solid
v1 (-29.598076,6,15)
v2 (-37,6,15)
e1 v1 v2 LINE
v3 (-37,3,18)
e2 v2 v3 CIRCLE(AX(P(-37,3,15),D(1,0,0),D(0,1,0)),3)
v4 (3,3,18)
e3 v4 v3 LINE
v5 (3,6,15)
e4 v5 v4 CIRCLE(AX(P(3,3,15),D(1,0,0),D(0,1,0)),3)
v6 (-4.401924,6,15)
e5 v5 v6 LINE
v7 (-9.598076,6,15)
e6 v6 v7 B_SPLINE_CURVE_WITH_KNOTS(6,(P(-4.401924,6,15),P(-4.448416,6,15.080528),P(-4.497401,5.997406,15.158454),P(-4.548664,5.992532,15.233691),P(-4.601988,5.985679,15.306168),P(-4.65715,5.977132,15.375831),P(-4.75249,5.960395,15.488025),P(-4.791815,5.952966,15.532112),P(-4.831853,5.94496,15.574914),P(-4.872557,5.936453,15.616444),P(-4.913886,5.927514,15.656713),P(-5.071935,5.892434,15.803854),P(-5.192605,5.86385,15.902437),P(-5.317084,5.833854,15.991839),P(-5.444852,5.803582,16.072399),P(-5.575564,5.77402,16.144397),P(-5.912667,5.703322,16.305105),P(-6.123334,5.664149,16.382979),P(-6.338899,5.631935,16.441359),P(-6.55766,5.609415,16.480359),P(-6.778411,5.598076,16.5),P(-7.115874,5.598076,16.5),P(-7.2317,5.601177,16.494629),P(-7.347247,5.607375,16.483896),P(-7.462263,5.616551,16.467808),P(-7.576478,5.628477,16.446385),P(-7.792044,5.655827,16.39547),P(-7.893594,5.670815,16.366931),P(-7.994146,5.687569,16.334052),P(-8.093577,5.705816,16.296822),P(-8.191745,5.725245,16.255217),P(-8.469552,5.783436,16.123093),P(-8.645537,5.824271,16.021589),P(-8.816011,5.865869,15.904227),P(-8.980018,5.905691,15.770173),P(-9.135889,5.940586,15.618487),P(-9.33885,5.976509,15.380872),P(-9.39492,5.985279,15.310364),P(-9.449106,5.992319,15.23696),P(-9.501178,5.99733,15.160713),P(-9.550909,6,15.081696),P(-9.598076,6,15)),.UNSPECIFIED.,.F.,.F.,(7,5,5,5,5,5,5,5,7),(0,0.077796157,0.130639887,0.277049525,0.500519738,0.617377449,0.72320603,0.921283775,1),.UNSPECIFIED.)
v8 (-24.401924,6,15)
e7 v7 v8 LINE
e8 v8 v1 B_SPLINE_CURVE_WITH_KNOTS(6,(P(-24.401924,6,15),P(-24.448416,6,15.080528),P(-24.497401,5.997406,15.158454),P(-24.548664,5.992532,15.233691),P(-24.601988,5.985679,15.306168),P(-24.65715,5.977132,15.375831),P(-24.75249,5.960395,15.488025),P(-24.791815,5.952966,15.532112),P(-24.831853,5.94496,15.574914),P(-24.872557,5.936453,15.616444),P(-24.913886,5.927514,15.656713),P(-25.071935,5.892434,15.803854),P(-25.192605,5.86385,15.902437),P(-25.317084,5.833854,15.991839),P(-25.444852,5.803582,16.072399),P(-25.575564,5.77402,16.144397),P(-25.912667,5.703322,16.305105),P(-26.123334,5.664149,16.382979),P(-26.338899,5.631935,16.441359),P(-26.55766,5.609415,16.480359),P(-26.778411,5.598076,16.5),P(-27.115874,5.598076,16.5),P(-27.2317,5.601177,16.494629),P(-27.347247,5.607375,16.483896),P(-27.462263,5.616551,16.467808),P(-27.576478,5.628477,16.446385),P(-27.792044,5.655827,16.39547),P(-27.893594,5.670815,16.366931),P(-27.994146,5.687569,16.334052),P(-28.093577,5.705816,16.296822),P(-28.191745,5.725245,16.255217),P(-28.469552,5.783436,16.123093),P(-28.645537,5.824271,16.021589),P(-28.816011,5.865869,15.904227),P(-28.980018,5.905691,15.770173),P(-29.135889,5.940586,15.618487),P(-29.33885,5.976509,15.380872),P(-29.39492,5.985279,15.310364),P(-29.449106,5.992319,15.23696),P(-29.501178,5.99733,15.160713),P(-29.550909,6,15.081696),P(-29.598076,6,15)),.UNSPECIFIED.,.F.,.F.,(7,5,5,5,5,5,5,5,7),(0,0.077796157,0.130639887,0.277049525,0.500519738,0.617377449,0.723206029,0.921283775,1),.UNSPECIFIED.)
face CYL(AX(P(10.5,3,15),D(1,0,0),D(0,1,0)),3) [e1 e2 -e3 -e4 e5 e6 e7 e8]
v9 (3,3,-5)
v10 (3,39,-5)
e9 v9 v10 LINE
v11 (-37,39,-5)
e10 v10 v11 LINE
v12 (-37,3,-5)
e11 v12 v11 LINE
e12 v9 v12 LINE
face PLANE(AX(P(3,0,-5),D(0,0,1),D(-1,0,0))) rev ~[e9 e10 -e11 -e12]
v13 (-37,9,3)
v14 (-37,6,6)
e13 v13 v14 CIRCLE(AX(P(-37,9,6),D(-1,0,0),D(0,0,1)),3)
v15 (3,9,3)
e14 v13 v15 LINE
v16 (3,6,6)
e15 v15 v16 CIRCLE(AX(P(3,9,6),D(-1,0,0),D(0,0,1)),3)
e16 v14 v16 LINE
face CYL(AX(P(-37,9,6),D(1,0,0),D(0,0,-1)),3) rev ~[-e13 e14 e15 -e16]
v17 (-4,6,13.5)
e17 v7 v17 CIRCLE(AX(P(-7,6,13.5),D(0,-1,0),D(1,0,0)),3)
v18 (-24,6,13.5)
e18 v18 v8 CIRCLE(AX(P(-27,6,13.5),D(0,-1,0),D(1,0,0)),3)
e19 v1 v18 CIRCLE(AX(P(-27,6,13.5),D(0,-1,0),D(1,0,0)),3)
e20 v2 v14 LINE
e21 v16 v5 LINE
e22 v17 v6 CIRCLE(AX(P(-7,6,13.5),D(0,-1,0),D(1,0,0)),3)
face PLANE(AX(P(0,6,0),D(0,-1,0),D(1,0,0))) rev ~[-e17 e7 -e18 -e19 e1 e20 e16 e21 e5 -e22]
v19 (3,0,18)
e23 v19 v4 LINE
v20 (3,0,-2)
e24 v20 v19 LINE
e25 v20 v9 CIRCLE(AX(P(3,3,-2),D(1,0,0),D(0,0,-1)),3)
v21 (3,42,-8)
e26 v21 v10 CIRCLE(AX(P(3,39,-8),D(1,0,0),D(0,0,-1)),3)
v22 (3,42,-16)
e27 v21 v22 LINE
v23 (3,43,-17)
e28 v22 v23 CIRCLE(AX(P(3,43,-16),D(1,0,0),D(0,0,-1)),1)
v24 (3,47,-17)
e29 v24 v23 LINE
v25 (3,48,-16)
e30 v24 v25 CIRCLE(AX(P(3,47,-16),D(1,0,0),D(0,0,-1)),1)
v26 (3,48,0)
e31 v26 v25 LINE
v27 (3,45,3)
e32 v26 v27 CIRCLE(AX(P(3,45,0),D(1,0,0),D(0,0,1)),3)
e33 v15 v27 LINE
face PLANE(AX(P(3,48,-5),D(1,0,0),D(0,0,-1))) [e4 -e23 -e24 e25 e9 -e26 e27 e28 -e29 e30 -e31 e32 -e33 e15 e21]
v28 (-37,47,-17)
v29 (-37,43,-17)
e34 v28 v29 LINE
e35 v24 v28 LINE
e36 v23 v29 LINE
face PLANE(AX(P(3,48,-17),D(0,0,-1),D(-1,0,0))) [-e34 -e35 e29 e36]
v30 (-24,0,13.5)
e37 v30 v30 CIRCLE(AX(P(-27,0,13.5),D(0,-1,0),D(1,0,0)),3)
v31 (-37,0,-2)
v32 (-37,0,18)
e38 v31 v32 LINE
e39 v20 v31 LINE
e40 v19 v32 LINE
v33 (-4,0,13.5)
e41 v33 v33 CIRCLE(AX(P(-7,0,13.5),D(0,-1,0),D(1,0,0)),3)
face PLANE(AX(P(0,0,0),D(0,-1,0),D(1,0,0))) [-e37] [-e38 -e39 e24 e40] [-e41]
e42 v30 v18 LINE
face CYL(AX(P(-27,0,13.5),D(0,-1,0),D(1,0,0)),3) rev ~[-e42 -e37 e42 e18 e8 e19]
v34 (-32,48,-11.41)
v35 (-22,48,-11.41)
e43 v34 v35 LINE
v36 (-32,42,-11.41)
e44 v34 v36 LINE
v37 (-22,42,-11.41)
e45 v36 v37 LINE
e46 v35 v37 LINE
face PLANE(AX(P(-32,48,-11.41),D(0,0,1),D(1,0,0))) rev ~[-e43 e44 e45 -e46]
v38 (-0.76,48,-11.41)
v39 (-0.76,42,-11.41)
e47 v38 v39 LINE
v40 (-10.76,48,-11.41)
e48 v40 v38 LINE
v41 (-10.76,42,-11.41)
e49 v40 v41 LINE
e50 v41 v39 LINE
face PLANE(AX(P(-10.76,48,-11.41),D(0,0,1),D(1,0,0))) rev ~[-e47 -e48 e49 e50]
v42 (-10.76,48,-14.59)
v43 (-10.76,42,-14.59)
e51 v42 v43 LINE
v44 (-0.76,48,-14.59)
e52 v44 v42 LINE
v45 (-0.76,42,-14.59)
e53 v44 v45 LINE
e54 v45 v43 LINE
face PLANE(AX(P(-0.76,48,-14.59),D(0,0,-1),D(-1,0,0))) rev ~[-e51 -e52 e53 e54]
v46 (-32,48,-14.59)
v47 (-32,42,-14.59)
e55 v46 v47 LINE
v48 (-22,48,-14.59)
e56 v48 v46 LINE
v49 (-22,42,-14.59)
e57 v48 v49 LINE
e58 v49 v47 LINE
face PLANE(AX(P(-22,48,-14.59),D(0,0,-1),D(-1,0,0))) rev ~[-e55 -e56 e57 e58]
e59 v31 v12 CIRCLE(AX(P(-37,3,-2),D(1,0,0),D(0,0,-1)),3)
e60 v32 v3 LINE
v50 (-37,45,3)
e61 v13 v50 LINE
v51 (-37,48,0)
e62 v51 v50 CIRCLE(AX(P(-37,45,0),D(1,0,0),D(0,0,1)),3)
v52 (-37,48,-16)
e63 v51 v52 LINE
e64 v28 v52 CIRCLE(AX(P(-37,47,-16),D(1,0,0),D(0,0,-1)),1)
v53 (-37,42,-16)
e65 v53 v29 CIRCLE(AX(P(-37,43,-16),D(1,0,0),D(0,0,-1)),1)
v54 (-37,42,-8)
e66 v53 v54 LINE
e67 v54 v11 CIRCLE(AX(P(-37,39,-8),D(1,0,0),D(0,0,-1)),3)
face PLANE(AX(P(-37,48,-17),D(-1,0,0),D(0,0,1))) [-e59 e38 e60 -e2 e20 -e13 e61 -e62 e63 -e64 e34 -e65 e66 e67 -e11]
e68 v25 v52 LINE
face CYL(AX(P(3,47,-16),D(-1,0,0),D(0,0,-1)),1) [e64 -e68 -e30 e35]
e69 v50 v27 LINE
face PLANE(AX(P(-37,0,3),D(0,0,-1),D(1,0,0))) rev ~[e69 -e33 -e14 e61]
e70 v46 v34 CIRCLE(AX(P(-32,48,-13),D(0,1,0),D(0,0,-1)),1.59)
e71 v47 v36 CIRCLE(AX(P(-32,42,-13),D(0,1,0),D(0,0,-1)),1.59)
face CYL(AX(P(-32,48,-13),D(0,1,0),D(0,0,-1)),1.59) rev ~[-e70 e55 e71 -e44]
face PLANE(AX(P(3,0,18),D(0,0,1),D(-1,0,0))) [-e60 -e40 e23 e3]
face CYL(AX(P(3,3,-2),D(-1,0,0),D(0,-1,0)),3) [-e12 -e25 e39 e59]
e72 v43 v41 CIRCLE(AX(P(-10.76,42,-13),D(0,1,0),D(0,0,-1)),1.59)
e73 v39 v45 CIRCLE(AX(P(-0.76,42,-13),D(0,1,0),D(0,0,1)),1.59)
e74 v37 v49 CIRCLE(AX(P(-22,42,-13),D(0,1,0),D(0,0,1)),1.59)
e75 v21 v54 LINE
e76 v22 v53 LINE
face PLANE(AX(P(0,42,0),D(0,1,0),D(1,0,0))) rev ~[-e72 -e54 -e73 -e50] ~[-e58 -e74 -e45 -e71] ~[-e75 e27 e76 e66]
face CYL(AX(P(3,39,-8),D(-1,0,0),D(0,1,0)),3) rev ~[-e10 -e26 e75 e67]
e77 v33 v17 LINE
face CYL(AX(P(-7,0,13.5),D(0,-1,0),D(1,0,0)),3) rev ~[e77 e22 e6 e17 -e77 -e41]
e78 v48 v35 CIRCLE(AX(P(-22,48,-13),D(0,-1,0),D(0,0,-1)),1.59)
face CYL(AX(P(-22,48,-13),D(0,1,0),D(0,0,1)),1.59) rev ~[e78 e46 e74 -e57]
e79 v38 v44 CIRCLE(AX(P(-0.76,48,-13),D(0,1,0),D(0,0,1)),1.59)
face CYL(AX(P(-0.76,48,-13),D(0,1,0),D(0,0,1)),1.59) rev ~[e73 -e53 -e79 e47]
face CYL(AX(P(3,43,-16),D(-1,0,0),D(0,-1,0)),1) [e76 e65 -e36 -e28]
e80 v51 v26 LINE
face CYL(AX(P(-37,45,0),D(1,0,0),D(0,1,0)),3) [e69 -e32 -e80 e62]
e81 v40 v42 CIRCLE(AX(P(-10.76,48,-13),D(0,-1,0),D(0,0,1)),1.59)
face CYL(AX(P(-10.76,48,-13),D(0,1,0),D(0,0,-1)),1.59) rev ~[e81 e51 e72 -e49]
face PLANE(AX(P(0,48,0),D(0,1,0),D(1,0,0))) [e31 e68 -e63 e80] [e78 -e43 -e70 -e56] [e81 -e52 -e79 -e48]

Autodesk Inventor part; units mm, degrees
ref_plane "YZ Plane" through (0, 0, 0) normal (1, 0, 0) x (0, 1, 0)
ref_plane "XZ Plane" through (0, 0, 0) normal (0, 1, 0) x (-1, 0, 0)
ref_plane "XY Plane" through (0, 0, 0) normal (0, 0, 1) x (1, 0, 0)
sketch "Sketch1" plane through (0, 0, 0) normal (0, 1, 0) x (-1, 0, 0)
  line L0 (0, 0) -> (34, 0)
  line L1 (34, 0) -> (34, -2)
  line L2 (34, -2) -> (0, -2)
  line L3 (0, -2) -> (0, 0)
  line L4 (37, -5) -> (37, 3)
  line L5 (37, 3) -> (-3, 3)
  line L6 (-3, 3) -> (-3, -5)
  line L7 (-3, -5) -> (37, -5)
  dimension "d0" = 34
  dimension "d1" = 2
  dimension "d2" = 3
extrude "Extrusion1" add sketch "Sketch1" along normal blind 48 contours L0 L1 L2 L3 | L7 L6 L5 L4
sketch "Sketch3" plane through (0, 0, 0) normal (0, -1, 0) x (1, 0, 0)
  line L0 (-37, 3) -> (3, 3) projected
  line L1 (-37, 3) -> (3, 3)
  line L2 (3, 3) -> (3, 18)
  line L3 (3, 18) -> (-37, 18)
  line L4 (-37, 18) -> (-37, 3)
  line L5 (3, -5) -> (-37, -5) projected
  line L6 (-37, -5) -> (3, -5)
  line L7 (3, -5) -> (3, -20)
  line L8 (3, -20) -> (-37, -20)
  line L9 (-37, -20) -> (-37, -5)
  circle A0 centre (-27, -12.5) radius 3
  circle A1 centre (-27, 13.5) radius 3
  circle A2 centre (-7, -12.5) radius 3
  circle A3 centre (-7, 13.5) radius 3
  point P0 (0, 0)
  point P1 (3, -5)
  dimension "d5" = 40
  dimension "d6" = 15
  dimension "d7" = 40
  dimension "d8" = 15
  dimension "d9" = 6
  dimension "d10" = 10
  dimension "d11" = 7.5
  dimension "d14" = 26
  dimension "d17" = 20
extrude "Extrusion2" add sketch "Sketch3" against normal blind 6 contours L4 L3 L2 L0
sketch "Sketch5" plane through (0, 48, 0) normal (0, 1, 0) x (1, 0, 0)
  line L0 (3, 5) -> (-37, 5) projected
  line L1 (-37, 5) -> (3, 5)
  line L2 (3, 5) -> (3, 17)
  line L3 (3, 17) -> (-37, 17)
  line L4 (-37, 17) -> (-37, 5)
  line L5 (-32, 13) -> (-22, 13) construction
  line L6 (-32, 11.41) -> (-22, 11.41)
  line L7 (-22, 14.59) -> (-32, 14.59)
  arc A0 (-32, 14.59) -> (-32, 11.41) centre (-32, 13) ccw
  arc A1 (-22, 11.41) -> (-22, 14.59) centre (-22, 13) ccw
  line L8 (-32, 13) -> (-22, 13) construction
  line L9 (-22, 13) -> (-10.76, 13)
  line L10 (-22, 13) -> (-10.76, 13) construction
  line L11 (-10.76, 13) -> (-0.76, 13) construction
  line L12 (-10.76, 11.41) -> (-0.76, 11.41)
  line L13 (-0.76, 14.59) -> (-10.76, 14.59)
  arc A2 (-10.76, 14.59) -> (-10.76, 11.41) centre (-10.76, 13) ccw
  arc A3 (-0.76, 11.41) -> (-0.76, 14.59) centre (-0.76, 13) ccw
  point P0 (0, 0)
  point P1 (-27, 13)
  point P2 (-5.76, 13)
  point P3 (3, 5)
  dimension "d40" = 40
  dimension "d41" = 12
  dimension "d43" = 10
  dimension "d44" = 0
  dimension "d45" = 3.18
  dimension "d46" = 11.24
  dimension "d47" = 0
  dimension "d48" = 10
  dimension "d49" = 3.18
  dimension "d57" = 4
  dimension "d58" = 10
extrude "Extrusion4" add sketch "Sketch5" against normal blind 6
fillet "Fillet1" radius 3 1 edges at (-17, 42, -5)
fillet "Fillet2" radius 3 2 edges at (-17, 48, 3) (-17, 6, 3)
fillet "Fillet3" radius 3 1 edges at (-17, 6, 18)
fillet "Fillet4" radius 3 1 edges at (-17, 0, -5)
fillet "Fillet5" radius 1 2 edges at (-17, 48, -17) (-17, 42, -17)
properties part number "MagnetActuatorHolder"
